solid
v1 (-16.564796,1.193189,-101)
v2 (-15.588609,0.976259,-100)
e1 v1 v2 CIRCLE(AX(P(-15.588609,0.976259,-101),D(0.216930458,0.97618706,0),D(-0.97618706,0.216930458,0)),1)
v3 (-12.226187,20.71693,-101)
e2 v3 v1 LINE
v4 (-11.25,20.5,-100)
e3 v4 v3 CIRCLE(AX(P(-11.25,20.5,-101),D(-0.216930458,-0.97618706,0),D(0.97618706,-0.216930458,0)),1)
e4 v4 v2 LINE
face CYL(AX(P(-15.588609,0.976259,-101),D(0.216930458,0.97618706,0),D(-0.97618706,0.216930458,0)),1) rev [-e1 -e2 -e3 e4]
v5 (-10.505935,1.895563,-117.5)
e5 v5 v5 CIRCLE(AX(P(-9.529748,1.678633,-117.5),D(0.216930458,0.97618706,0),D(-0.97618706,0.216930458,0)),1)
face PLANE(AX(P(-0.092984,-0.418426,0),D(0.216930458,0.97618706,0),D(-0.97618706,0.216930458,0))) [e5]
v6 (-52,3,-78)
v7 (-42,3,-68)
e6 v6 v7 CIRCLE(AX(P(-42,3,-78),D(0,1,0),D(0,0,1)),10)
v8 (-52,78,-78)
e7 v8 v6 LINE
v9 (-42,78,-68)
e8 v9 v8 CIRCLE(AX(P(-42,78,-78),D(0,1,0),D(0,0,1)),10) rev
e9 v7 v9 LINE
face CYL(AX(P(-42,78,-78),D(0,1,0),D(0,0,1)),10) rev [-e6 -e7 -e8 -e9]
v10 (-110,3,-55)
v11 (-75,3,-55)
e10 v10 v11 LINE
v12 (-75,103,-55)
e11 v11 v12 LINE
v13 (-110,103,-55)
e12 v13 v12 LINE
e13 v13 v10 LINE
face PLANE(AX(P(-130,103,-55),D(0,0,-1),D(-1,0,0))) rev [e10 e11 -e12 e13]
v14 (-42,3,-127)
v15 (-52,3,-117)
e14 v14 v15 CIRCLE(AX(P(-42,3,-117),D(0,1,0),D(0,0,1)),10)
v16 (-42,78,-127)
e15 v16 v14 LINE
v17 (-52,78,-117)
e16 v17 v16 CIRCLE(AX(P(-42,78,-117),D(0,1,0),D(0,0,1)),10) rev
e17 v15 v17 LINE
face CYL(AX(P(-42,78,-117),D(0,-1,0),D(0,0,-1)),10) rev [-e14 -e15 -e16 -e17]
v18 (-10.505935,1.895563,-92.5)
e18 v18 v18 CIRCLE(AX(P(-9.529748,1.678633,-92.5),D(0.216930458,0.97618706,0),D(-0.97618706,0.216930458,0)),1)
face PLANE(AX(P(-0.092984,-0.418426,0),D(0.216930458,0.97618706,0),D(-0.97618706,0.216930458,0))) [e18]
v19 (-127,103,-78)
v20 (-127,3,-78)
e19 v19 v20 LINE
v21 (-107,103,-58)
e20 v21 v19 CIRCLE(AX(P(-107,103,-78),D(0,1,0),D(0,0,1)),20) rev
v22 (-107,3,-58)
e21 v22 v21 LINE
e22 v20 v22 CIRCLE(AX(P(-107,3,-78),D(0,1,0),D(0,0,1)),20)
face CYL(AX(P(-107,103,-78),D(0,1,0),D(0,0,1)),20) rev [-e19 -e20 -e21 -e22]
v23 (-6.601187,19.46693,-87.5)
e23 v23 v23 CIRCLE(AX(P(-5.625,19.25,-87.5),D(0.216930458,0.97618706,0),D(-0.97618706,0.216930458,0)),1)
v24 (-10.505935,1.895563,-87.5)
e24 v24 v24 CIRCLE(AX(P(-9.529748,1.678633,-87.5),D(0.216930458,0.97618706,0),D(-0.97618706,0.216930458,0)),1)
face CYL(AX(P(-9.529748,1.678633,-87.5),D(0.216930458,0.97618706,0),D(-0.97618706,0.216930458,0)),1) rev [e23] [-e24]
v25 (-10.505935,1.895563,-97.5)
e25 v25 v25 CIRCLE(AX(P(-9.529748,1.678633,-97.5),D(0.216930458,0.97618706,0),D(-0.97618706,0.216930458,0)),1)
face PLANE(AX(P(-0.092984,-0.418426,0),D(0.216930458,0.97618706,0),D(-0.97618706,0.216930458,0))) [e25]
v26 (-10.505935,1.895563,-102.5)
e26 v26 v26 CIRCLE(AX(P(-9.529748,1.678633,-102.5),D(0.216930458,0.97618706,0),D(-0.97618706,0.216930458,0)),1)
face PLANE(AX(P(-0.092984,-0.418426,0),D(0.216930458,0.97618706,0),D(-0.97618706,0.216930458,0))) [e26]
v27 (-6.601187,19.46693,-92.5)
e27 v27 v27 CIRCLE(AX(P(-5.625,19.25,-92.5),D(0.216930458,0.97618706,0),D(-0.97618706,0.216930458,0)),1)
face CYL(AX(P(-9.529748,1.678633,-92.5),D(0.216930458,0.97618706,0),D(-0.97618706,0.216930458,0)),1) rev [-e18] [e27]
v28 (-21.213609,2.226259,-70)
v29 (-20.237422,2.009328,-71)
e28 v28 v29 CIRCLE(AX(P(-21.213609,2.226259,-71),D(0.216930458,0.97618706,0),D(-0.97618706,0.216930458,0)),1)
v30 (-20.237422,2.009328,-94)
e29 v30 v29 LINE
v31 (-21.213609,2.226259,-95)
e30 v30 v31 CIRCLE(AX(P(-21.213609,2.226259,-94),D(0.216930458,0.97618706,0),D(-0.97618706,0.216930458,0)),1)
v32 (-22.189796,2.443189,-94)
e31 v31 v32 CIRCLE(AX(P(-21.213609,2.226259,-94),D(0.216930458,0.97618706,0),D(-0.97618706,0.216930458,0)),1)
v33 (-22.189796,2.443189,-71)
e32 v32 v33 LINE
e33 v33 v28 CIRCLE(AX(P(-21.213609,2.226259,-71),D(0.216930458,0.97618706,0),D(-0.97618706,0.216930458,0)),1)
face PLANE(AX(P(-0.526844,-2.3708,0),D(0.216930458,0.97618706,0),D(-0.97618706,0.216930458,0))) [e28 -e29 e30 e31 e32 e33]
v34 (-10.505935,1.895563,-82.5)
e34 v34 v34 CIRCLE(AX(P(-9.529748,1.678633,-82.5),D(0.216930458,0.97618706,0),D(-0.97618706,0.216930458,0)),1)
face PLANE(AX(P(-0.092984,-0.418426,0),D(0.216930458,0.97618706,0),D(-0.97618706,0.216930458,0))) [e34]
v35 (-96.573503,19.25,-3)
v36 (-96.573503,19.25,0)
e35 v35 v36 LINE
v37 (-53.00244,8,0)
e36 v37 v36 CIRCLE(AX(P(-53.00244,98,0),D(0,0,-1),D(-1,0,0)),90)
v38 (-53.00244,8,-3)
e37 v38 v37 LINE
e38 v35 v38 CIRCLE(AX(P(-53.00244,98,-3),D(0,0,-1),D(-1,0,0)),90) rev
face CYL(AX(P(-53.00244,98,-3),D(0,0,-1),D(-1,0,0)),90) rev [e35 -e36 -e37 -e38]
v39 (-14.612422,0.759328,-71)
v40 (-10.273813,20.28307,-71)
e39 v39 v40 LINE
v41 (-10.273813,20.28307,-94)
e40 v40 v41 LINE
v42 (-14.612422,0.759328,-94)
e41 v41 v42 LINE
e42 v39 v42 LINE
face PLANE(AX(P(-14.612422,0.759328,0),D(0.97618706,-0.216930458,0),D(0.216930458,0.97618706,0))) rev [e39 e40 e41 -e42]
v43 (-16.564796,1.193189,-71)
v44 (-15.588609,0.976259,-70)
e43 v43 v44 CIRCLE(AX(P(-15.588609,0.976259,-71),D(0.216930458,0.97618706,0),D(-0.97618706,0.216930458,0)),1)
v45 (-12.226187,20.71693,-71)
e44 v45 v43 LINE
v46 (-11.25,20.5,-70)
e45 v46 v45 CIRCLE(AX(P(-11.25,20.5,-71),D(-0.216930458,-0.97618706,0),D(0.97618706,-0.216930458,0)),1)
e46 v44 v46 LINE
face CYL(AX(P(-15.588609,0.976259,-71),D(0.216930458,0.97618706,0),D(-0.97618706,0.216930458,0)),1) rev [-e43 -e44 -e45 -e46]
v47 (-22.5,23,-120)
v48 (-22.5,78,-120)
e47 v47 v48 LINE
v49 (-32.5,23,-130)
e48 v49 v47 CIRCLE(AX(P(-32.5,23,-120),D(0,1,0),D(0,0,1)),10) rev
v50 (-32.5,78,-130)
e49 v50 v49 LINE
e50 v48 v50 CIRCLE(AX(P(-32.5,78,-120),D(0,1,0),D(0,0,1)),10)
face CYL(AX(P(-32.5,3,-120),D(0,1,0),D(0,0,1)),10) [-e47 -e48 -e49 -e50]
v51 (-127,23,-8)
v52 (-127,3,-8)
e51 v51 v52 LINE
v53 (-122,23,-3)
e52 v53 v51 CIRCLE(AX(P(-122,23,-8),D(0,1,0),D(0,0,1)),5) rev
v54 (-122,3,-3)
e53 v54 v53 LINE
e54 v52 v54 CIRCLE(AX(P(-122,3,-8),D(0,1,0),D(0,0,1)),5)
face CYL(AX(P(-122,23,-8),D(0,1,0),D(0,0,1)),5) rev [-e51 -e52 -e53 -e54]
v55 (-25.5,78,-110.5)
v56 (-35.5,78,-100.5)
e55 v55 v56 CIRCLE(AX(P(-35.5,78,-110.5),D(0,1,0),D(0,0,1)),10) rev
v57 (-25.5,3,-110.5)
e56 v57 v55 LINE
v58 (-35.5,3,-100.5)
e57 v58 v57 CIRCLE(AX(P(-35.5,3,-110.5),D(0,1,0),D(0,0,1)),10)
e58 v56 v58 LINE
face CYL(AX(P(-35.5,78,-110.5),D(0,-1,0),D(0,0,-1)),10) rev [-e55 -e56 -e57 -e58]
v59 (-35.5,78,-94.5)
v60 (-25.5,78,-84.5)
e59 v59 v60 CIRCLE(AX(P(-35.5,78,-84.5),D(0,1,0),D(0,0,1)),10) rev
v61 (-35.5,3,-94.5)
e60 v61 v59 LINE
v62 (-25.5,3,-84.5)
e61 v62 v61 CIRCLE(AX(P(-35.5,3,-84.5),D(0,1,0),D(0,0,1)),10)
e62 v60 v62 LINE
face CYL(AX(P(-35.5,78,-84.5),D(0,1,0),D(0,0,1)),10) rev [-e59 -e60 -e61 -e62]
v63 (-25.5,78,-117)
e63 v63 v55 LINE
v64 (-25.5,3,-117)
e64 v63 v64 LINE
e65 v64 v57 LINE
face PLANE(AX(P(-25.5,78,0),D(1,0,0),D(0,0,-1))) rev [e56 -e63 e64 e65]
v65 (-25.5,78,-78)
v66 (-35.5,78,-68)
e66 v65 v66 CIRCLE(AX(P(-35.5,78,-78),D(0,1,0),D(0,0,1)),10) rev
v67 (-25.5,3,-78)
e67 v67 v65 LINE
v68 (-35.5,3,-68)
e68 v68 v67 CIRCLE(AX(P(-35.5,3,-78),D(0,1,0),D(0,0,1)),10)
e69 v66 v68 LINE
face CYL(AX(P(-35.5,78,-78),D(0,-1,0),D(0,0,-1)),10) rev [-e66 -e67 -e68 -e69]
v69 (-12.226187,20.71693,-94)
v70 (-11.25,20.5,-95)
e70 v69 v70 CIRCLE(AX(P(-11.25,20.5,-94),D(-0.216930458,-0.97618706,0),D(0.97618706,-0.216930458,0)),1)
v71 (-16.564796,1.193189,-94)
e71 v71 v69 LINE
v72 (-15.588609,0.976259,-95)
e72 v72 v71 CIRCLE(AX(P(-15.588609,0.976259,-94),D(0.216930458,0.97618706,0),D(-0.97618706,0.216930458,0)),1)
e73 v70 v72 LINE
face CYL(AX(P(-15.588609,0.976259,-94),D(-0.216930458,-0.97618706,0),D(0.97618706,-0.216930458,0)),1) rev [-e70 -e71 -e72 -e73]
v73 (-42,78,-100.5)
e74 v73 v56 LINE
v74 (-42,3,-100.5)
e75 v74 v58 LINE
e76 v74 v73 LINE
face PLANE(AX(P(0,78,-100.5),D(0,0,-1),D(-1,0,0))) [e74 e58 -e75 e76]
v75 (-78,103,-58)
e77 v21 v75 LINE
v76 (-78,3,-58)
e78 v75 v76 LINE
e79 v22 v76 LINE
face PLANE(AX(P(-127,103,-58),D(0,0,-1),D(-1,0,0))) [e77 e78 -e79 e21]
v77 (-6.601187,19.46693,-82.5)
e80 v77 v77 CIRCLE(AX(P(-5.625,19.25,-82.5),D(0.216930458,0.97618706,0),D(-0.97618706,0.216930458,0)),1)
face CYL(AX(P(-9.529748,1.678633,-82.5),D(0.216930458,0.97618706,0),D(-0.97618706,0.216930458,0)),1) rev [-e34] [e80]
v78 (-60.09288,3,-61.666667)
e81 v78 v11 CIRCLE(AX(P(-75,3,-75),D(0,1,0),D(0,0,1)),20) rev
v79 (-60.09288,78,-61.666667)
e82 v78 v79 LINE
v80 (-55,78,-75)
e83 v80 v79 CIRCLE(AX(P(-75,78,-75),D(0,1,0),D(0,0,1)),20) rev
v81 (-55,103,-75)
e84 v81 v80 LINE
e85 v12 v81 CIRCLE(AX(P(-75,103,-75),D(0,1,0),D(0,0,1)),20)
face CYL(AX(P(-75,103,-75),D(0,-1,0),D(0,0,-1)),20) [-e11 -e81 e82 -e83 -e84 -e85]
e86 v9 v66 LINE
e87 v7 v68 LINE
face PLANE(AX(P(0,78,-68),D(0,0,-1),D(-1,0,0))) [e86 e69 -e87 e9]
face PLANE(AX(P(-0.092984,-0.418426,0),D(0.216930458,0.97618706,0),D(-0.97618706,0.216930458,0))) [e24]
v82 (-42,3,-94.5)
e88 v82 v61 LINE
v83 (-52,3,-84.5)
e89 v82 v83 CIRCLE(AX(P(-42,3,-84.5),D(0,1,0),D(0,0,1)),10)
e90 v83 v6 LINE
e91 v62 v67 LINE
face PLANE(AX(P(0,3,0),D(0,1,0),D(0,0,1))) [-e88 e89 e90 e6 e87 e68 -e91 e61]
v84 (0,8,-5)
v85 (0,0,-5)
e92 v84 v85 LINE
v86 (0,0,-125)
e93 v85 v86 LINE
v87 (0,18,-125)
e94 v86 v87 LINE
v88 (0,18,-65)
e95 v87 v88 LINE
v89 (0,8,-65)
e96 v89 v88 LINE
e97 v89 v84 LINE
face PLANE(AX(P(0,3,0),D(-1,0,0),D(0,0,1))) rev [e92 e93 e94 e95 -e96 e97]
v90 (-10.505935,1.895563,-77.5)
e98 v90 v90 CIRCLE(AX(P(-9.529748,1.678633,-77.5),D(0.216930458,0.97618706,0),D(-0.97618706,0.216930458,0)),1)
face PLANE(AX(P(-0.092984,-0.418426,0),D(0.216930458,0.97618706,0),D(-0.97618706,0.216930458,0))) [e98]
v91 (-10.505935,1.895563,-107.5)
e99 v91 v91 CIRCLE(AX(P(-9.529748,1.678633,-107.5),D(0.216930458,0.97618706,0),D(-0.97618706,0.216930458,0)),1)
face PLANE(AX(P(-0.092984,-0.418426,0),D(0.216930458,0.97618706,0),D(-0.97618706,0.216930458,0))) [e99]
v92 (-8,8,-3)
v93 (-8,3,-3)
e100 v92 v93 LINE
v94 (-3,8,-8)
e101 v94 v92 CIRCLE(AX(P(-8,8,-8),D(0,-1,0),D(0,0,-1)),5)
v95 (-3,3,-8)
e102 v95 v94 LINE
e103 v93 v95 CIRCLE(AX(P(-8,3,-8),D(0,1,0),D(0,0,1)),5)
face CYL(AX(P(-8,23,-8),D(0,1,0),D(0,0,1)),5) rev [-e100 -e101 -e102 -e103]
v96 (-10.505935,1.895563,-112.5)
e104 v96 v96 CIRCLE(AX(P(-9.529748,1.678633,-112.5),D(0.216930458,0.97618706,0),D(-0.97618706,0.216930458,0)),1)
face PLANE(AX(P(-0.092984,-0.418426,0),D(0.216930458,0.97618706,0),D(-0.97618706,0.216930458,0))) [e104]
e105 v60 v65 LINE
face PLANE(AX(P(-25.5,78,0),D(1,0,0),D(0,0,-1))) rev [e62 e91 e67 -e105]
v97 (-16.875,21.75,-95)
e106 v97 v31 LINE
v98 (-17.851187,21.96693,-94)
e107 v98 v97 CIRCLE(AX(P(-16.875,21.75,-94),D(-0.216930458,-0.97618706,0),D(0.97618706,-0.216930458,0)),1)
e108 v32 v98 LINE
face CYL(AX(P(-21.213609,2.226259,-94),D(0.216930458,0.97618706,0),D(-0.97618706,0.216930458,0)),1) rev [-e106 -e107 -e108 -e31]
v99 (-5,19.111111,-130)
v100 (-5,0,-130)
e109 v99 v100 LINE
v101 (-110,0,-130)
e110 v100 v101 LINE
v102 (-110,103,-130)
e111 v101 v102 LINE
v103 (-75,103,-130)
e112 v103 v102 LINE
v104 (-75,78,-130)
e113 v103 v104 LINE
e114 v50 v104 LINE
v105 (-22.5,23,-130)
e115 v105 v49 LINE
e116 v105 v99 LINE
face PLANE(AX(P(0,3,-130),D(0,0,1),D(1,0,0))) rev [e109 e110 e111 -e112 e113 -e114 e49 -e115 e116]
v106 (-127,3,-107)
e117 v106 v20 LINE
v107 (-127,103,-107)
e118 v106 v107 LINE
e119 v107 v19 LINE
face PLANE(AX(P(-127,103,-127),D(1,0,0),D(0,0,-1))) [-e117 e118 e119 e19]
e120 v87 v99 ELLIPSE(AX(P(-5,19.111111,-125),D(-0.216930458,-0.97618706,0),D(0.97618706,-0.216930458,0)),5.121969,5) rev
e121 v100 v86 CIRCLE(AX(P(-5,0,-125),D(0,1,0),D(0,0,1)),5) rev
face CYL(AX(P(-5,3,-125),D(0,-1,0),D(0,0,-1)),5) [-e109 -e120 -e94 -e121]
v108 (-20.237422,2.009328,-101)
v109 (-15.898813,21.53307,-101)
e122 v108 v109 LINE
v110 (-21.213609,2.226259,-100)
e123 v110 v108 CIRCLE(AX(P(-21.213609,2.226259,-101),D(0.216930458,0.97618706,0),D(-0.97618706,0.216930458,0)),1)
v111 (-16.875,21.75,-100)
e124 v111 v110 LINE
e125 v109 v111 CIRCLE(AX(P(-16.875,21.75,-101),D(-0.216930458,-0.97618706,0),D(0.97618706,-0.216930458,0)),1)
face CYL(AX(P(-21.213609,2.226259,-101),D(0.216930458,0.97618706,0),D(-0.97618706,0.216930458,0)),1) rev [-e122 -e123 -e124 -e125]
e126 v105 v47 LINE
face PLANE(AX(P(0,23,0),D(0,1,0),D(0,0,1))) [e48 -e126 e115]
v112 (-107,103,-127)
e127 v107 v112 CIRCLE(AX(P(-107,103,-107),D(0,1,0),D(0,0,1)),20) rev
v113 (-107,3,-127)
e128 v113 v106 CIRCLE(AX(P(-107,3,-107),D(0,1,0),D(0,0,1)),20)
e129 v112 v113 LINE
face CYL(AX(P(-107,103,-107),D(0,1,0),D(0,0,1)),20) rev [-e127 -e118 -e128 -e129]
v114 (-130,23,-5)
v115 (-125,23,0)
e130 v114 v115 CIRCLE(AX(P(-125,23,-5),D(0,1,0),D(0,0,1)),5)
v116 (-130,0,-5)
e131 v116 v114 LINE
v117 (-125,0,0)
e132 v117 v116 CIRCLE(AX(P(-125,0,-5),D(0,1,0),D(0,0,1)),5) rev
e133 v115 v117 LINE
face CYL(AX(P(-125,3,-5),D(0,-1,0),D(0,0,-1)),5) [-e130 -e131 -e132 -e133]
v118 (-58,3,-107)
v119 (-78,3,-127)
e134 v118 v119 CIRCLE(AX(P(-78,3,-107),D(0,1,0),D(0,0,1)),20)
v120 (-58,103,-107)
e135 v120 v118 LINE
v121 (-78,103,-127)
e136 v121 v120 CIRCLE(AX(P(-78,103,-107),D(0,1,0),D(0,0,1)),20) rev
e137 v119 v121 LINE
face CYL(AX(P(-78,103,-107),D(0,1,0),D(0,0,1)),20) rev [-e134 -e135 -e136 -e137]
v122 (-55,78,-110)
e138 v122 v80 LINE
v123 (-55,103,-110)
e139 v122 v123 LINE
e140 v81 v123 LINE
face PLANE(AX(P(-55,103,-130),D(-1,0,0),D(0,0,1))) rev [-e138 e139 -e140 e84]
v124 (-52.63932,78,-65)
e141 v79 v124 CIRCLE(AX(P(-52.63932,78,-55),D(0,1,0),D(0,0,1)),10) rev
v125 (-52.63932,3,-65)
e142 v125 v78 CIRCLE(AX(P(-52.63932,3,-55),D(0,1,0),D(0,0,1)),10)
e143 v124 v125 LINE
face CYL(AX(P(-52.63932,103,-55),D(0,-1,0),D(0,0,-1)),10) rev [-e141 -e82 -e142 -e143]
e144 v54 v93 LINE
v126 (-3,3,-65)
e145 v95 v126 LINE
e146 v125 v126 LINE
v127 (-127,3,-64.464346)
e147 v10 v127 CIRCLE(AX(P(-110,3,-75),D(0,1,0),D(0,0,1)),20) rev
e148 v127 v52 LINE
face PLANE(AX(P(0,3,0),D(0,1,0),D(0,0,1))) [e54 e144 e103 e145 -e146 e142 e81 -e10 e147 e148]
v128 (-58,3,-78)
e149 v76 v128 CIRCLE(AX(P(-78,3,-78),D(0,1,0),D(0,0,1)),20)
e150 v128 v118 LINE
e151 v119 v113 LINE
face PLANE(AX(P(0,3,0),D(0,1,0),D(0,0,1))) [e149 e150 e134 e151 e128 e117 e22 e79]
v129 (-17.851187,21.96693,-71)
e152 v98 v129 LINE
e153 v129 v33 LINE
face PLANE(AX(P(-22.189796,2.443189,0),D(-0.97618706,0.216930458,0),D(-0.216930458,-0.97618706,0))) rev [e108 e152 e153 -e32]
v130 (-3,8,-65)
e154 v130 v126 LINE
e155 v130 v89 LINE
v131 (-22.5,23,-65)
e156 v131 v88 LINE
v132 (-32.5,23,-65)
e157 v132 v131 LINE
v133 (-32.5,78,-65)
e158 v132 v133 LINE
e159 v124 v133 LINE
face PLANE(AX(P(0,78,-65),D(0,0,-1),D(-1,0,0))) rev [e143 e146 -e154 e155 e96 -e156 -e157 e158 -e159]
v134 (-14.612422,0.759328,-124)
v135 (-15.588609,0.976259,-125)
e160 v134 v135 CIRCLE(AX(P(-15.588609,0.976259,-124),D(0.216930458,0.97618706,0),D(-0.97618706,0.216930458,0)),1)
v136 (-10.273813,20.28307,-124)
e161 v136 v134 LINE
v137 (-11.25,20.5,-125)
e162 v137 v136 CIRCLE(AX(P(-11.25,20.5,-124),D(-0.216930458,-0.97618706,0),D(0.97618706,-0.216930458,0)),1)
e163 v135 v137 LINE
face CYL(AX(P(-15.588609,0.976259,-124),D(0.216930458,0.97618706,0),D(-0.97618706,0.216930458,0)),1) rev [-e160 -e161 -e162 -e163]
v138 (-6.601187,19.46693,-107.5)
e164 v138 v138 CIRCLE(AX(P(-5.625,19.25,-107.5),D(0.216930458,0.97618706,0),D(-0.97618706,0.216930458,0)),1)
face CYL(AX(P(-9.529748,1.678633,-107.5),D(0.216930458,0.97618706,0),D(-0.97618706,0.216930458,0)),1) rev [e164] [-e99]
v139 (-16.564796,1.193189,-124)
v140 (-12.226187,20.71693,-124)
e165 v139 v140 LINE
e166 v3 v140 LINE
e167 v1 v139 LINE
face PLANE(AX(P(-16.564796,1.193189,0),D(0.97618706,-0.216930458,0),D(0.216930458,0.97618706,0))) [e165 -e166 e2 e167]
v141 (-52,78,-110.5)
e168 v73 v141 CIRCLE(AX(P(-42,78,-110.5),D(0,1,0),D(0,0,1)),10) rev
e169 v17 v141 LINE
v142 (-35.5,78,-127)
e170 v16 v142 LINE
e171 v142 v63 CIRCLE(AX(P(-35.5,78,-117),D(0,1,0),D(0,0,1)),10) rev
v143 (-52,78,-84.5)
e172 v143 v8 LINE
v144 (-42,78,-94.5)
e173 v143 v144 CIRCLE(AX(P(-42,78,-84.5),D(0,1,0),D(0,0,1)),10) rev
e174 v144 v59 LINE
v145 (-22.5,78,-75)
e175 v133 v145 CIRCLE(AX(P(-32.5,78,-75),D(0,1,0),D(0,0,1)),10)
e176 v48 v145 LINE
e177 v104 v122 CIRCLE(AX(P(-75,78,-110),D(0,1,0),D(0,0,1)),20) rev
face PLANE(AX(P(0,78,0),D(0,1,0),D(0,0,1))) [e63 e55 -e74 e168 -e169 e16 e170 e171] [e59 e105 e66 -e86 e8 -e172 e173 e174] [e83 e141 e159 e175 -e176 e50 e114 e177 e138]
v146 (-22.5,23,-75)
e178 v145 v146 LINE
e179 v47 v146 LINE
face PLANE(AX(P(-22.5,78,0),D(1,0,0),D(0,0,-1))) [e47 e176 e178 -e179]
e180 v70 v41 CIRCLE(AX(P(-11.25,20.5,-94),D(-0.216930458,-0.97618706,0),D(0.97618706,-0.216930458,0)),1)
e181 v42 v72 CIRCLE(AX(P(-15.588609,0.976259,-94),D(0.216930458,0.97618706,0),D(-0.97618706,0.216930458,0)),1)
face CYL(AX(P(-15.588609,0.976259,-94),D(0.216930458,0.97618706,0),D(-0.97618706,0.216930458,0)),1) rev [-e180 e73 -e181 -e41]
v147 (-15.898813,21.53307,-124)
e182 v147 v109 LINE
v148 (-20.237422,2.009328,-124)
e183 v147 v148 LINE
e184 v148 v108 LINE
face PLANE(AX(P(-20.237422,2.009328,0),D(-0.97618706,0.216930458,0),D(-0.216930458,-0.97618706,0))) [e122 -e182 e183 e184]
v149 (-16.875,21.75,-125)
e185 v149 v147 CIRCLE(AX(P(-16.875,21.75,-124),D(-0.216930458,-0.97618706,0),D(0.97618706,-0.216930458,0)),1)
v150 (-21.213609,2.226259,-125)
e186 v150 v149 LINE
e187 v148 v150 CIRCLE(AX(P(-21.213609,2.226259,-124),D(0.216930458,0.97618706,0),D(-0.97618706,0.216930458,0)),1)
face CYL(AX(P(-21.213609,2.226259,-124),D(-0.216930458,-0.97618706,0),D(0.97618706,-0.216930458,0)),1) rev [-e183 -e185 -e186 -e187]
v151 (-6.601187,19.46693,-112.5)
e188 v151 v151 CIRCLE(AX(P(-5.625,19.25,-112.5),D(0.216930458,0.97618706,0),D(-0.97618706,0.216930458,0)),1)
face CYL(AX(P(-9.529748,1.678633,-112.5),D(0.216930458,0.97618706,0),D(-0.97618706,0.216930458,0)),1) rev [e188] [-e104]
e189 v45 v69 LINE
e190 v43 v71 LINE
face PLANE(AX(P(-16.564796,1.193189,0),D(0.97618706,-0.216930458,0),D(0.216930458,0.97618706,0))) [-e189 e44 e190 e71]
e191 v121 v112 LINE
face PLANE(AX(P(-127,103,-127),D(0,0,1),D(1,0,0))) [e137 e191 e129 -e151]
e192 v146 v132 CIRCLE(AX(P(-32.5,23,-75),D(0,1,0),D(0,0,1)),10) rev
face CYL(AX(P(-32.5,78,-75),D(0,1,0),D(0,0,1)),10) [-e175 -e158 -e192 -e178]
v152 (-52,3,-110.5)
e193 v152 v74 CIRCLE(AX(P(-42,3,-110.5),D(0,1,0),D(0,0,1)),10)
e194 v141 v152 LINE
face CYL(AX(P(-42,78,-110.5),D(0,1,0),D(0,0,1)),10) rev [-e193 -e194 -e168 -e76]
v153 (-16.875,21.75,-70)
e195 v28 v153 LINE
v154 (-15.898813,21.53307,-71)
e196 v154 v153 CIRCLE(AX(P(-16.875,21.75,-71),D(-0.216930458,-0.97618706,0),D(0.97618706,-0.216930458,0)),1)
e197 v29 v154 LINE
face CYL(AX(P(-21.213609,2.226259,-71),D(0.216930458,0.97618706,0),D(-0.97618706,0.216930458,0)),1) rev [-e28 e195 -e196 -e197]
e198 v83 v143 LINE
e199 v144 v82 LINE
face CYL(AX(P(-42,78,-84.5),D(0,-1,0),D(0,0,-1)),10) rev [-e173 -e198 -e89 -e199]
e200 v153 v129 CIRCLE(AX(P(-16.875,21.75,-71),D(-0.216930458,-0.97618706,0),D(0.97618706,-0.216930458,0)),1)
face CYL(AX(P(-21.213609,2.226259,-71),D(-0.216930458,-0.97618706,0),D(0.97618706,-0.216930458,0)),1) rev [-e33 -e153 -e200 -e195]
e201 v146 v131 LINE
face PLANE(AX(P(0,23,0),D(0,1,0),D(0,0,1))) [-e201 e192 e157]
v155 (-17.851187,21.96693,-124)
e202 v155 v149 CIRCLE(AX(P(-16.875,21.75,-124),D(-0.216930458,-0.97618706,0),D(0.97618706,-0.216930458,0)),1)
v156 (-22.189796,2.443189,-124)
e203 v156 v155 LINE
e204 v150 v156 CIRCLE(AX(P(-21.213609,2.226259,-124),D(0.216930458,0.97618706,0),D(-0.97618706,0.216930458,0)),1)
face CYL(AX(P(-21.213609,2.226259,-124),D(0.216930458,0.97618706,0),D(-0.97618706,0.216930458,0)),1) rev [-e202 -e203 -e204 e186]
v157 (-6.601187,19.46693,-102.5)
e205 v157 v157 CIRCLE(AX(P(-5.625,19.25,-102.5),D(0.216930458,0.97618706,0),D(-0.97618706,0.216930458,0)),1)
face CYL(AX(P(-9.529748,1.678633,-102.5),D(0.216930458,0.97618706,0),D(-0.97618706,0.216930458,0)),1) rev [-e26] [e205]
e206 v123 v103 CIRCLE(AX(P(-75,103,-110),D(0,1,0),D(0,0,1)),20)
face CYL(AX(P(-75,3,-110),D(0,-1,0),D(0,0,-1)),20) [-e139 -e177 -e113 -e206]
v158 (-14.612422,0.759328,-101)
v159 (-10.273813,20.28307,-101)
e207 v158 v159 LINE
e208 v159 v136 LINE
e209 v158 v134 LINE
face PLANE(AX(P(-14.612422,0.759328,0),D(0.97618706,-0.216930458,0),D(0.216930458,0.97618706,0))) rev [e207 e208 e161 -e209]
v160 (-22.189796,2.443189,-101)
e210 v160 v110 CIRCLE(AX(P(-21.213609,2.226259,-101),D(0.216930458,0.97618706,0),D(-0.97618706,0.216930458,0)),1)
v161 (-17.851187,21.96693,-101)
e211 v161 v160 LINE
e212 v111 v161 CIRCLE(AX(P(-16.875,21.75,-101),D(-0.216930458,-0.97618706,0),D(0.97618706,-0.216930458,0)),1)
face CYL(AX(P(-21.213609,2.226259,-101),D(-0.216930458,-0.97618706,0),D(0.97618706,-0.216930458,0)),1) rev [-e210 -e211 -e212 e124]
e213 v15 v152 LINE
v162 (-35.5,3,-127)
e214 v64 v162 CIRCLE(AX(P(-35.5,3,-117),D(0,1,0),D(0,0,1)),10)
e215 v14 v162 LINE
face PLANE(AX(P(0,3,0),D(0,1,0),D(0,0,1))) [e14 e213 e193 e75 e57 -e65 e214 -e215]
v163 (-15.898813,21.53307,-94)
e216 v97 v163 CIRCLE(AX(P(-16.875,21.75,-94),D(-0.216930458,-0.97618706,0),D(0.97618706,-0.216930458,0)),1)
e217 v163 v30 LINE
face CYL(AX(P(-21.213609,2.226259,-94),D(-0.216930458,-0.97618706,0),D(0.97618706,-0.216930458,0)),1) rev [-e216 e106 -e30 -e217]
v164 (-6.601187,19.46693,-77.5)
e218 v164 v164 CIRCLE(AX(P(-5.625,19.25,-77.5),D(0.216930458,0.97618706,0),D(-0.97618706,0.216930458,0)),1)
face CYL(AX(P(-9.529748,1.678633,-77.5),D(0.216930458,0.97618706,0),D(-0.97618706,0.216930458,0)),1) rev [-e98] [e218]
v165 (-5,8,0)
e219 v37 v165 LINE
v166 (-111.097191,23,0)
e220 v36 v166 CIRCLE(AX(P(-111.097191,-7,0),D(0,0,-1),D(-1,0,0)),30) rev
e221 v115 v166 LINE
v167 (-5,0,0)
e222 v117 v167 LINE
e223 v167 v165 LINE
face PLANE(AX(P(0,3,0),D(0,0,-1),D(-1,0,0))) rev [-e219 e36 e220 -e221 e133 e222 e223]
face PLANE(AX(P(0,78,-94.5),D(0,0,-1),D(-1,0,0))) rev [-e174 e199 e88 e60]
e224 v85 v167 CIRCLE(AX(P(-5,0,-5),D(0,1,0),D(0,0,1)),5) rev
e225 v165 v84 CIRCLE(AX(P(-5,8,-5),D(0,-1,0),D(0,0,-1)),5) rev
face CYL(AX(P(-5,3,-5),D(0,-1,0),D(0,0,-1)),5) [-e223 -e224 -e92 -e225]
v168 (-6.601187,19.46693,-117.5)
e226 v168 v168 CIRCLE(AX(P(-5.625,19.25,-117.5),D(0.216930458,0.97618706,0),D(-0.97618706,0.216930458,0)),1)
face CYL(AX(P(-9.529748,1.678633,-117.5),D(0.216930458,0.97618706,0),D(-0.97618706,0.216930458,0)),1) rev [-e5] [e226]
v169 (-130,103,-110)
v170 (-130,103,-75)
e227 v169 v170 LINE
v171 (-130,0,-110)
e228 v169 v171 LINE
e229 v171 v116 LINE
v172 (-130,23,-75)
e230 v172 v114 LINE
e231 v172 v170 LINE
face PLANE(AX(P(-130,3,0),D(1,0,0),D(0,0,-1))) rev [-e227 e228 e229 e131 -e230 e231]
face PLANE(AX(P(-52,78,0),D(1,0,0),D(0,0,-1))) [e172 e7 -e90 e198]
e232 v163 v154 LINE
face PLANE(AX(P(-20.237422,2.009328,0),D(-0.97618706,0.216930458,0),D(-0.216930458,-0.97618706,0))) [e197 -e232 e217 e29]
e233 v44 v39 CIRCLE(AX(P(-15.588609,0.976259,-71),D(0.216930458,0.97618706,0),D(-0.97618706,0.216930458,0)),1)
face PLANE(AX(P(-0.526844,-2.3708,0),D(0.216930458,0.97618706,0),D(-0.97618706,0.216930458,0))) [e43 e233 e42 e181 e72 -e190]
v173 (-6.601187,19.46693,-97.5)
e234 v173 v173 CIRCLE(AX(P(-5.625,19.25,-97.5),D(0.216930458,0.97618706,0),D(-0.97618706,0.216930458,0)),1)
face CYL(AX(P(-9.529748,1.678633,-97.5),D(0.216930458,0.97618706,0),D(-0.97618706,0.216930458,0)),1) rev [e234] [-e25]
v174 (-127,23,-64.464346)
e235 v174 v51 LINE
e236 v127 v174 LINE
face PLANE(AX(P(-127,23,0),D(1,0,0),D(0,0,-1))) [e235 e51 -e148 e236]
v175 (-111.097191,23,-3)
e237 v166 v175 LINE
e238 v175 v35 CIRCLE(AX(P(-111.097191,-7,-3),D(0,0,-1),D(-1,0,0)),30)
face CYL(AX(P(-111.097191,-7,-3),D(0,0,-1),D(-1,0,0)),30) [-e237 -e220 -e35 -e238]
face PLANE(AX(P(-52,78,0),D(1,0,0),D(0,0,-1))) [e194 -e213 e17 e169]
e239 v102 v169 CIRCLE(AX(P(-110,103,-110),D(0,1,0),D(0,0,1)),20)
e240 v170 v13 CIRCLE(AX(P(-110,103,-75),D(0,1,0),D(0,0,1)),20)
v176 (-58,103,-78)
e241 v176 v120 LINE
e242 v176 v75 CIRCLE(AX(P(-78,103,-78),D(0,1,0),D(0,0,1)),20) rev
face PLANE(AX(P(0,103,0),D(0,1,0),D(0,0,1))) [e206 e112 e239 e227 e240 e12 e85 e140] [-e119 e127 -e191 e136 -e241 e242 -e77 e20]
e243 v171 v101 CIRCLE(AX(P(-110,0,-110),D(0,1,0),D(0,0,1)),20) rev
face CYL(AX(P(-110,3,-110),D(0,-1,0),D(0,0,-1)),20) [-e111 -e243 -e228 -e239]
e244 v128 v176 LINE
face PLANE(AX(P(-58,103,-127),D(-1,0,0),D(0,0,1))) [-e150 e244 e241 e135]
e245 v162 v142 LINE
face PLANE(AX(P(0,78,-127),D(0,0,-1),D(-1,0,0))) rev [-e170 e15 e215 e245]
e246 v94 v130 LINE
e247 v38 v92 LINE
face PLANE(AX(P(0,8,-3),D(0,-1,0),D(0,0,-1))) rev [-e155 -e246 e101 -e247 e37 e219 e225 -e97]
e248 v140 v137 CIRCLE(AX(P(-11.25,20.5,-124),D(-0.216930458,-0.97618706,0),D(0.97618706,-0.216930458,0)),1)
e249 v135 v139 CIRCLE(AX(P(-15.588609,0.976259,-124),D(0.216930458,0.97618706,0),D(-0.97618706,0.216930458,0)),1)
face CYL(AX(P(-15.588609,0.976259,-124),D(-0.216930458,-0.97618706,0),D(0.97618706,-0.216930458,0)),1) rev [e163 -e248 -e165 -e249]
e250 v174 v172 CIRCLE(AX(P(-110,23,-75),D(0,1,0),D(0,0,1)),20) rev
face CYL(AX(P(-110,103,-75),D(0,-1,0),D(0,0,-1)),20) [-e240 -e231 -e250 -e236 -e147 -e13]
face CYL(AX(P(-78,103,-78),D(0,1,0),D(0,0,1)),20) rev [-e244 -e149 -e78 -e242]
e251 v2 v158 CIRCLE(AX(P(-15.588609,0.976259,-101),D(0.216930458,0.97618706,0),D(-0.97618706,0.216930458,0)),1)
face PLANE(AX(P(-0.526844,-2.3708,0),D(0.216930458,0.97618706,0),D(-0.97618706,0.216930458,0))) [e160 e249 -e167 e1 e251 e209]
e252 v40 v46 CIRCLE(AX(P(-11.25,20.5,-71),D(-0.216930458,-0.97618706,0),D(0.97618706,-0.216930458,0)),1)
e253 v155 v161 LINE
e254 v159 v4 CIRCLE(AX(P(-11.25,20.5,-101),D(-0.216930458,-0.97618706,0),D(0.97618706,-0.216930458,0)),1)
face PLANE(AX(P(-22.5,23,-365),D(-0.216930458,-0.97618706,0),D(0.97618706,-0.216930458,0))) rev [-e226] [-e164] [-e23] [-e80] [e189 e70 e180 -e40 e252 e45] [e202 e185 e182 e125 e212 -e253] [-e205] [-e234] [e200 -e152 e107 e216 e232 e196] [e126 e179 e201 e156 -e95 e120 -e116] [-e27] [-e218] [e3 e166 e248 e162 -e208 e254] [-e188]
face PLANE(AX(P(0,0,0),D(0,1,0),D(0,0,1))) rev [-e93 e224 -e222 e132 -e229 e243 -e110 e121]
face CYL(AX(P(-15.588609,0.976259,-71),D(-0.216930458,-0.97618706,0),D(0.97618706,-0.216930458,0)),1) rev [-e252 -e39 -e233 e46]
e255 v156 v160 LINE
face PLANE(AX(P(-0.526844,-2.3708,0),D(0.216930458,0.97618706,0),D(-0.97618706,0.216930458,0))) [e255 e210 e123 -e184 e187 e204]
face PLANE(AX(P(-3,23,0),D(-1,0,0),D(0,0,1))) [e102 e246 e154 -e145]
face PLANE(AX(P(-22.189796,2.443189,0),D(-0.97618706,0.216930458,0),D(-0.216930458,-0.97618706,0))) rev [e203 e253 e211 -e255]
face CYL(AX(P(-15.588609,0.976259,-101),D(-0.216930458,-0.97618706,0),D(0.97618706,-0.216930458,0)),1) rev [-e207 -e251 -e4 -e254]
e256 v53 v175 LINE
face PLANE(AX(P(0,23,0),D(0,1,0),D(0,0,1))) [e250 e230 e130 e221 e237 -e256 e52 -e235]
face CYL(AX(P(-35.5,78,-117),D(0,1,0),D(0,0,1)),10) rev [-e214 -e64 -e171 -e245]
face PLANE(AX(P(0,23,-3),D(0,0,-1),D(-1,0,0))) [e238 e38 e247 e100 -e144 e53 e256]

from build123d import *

# Parameters (mm, degrees)
EXTRUDE_1_DEPTH      = 3
EXTRUDE_2_DEPTH      = 100
SKETCH_3_W           = 26.5
SKETCH_3_H           = 26.50000000000003
SKETCH_3_W_2         = 26.500000000000004
SKETCH_3_H_2         = 26.5
EXTRUDE_3_DEPTH      = 75
FILLET_2_R           = 20
FILLET_3_R           = 20
FILLET_6_R           = 10
EXTRUDE_7_DEPTH      = 20
SKETCH_14_W          = 22.50000000000002
SKETCH_14_H          = 65
EXTRUDE_8_DEPTH      = 20
SKETCH_15_W          = 102.75181222829023
SKETCH_15_H          = 15
CUT_EXTRUDE_6_DEPTH  = 2.99999999999999
FILLET_7_R           = 90
FILLET_8_R           = 30
SKETCH_17_W          = 62.00000000000001
SKETCH_17_H          = 15
CUT_EXTRUDE_8_DEPTH  = 2.99999999999999
FILLET_9_R           = 5
FILLET_11_R          = 20
FILLET_12_R          = 20
FILLET_13_R          = 10
CUT_EXTRUDE_9_DEPTH  = 300
SKETCH_19_R          = 1.0000000000000018
SKETCH_19_R_2        = 1
SKETCH_19_R_3        = 1.0000000000000033
CUT_EXTRUDE_12_DEPTH = 18
SKETCH_19_4_W        = 2
SKETCH_19_4_H        = 25
SKETCH_19_4_W_2      = 2.0000000000000018
CUT_EXTRUDE_13_DEPTH = 20
FILLET_15_R          = 1


# Some blends are built 0.0001 mm under size
with BuildPart() as part:
    # Эскиз1 → Бобышка-Вытянуть1 (new body)
    with BuildSketch(Plane(origin=(0, 0, 0), x_dir=(1, 0, 0), z_dir=(0, 1, 0))):
        Polygon((0, 0), (-130, -1.837e-14), (-130, 129.99999999999997), (0, 130), align=None)
    extrude(amount=EXTRUDE_1_DEPTH)

    # Эскиз2 → Бобышка-Вытянуть2 (add)
    with BuildSketch(Plane(origin=(0, 3, 0), x_dir=(1, 0, 0), z_dir=(0, 1, 0))):
        Polygon((-130, 129.99999999999997), (-55.00000000000002, 130.0000000000001), (-55.00000000000002, 55.0000000000001), (-130.00000000000003, 55.0000000000001), align=None)
        Polygon((-127, 126.99999999999997), (-58.00000000000002, 127.00000000000009), (-58.000000000000014, 58.0000000000001), (-127.00000000000003, 58.00000000000009), align=None, mode=Mode.SUBTRACT)
    extrude(amount=EXTRUDE_2_DEPTH)

    # Эскиз3 → Бобышка-Вытянуть3 (add)
    # profile 1 of 2: a face of its own
    with BuildSketch(Plane(origin=(0, 3, 0), x_dir=(1, 0, 0), z_dir=(0, 1, 0))):
        Polygon((-22.50000000000002, 130), (-55.00000000000002, 130), (-55.00000000000002, 97.5), (-22.500000000000014, 97.5), align=None)
        with Locations((-38.75000000000002, 113.75)):
            Rectangle(SKETCH_3_W, SKETCH_3_H, mode=Mode.SUBTRACT)
    # profile 2 of 2: a face of its own
    with BuildSketch(Plane(origin=(0, 3, 0), x_dir=(1, 0, 0), z_dir=(0, 1, 0))):
        Polygon((-22.500000000000014, 97.5), (-55.00000000000002, 97.5), (-55.00000000000002, 65), (-22.5, 65), align=None)
        with Locations((-38.750000000000014, 81.25)):
            Rectangle(SKETCH_3_W_2, SKETCH_3_H_2, mode=Mode.SUBTRACT)
    extrude(amount=EXTRUDE_3_DEPTH)

    # Скругление2
    fillet_2_edges = [part.edges().sort_by_distance(p)[0] for p in [
        (-127, 53, -126.99999999999997),
        (-130, 51.5, -129.99999999999997),
    ]]
    fillet(fillet_2_edges, radius=FILLET_2_R)

    # Скругление3
    fillet_3_edges = [part.edges().sort_by_distance(p)[0] for p in [
        (-58.000000000000014, 53, -58.0000000000001),
        (-55.00000000000002, 53, -55.0000000000001),
        (-58.00000000000002, 53, -127.00000000000009),
        (-55.00000000000002, 90.5, -130.0000000000001),
    ]]
    fillet(fillet_3_edges, radius=FILLET_3_R)

    # Скругление6
    fillet_6_edges = [part.edges().sort_by_distance(p)[0] for p in [
        (-57.6794919243113, 40.5, -65),
        (-52.000000000000014, 40.5, -94.50000000000001),
        (-25.500000000000014, 40.5, -94.50000000000001),
        (-25.500000000000014, 40.5, -68),
        (-52.00000000000003, 40.5, -127),
        (-25.50000000000002, 40.5, -127),
        (-25.50000000000002, 40.5, -100.49999999999999),
        (-52.00000000000003, 40.5, -100.49999999999999),
        (-52.000000000000014, 40.5, -68),
    ]]
    fillet(fillet_6_edges, radius=FILLET_6_R)

    # Эскиз4 → Бобышка-Вытянуть7 (add)
    with BuildSketch(Plane(origin=(0, 3, 0), x_dir=(1, 0, 0), z_dir=(0, 1, 0))):
        Polygon((-3, 65), (-3, 2.999999999999999), (0, 2.999999999999982), (0, 65), align=None)
        Polygon((-3, 2.999999999999982), (-126.99999999999997, 2.999999999999982), (-126.99999999999997, -2.132e-14), (0, -1.721e-14), (0, 2.999999999999982), align=None)
        Polygon((-127, 55.0000000000001), (-130, 55.0000000000001), (-130, -1.421e-14), (-126.99999999999997, -1.837e-14), (-126.99999999999997, 2.9999999999999787), align=None)
    extrude(amount=EXTRUDE_7_DEPTH)

    # Эскиз14 → Бобышка-Вытянуть8 (add)
    with BuildSketch(Plane(origin=(0, 3, 0), x_dir=(1, 0, 0), z_dir=(0, 1, 0))):
        with Locations((-11.25000000000001, 97.5)):
            Rectangle(SKETCH_14_W, SKETCH_14_H)
    extrude(amount=EXTRUDE_8_DEPTH)

    # Эскиз15 → Вырез-Вытянуть6 (cut)
    with BuildSketch(Plane.XY):
        with Locations((-51.37590611414512, 15.5)):
            Rectangle(SKETCH_15_W, SKETCH_15_H)
    extrude(amount=-CUT_EXTRUDE_6_DEPTH, mode=Mode.SUBTRACT)

    # Скругление7
    # the kernel refuses this fillet: 90 mm, written as the material it adds along each edge
    with BuildSketch(Plane(origin=(-102.75181222829023, 8, 0), x_dir=(-9.5e-16, 1, 0), z_dir=(0, 0, -1))) as fillet_7_piece_1:
        with BuildLine():
            CenterArc((89.99999999999996, 49.74937185533107), FILLET_7_R, 180.00000000000006, 33.55730976192069)
            Line((-4.713e-14, 49.749371855330985), (-1.800000000000047, 49.749371855330985))
            Line((-1.800000000000047, 49.749371855330985), (-1.7999999999999998, -1.71e-15))
            Line((-1.7999999999999998, -1.71e-15), (1.71e-15, -1.7999999999999972))
            ThreePointArc((1.71e-15, -1.7999999999999972), (7.499999999999995, -1.79999999999999), (13.499999999999988, -0.9949874371066173))
            Line((13.499999999999988, -0.9949874371066173), (14.999999999999986, 0))
        make_face()
    extrude(amount=2.99999999999999)

    # Скругление8
    fillet_8_edges = [part.edges().sort_by_distance(p)[0] for p in [
        (-102.75181222829023, 23, -1.499999999999995),
    ]]
    fillet(fillet_8_edges, radius=FILLET_8_R)

    # Эскиз17 → Вырез-Вытянуть8 (cut)
    with BuildSketch(Plane(origin=(0, 0, 0), x_dir=(0, 0, -1), z_dir=(1, 0, 0))):
        with Locations((33.99999999999999, 15.5)):
            Rectangle(SKETCH_17_W, SKETCH_17_H)
    extrude(amount=-CUT_EXTRUDE_8_DEPTH, mode=Mode.SUBTRACT)

    # Скругление9
    fillet_9_edges = [part.edges().sort_by_distance(p)[0] for p in [
        (-126.99999999999997, 13, -2.9999999999999805),
        (-3, 5.5, -2.9999999999999902),
        (0, 4, 2.99e-15),
        (-130, 11.5, 1.704e-14),
        (0, 11.5, -130),
    ]]
    fillet(fillet_9_edges, radius=FILLET_9_R)

    # Скругление11
    fillet_11_edges = [part.edges().sort_by_distance(p)[0] for p in [
        (-127.00000000000003, 53, -58.00000000000009),
    ]]
    fillet(fillet_11_edges, radius=FILLET_11_R)

    # Скругление12
    fillet_12_edges = [part.edges().sort_by_distance(p)[0] for p in [
        (-130.00000000000003, 63, -55.0000000000001),
    ]]
    fillet(fillet_12_edges, radius=FILLET_12_R)

    # Скругление13
    fillet_13_edges = [part.edges().sort_by_distance(p)[0] for p in [
        (-22.5, 50.5, -65),
        (-22.50000000000002, 50.5, -130),
    ]]
    fillet(fillet_13_edges, radius=FILLET_13_R)

    # Эскиз18 → Вырез-Вытянуть9 (cut)
    with BuildSketch(Plane.XY.offset(-65)):
        Polygon((-22.50000000000001, 22.999999999999993), (0, 18), (0, 23), align=None)
    extrude(amount=-CUT_EXTRUDE_9_DEPTH, mode=Mode.SUBTRACT)

    # Эскиз19 → Вырез-Вытянуть12 (cut)
    with BuildSketch(Plane(origin=(3.811764705882347, 17.15294117647059, 0), x_dir=(0.9761870601839528, -0.2169304578186562, 0), z_dir=(0.2169304578186562, 0.9761870601839528, 0))):
        with Locations(Location((-9.666963526543862, 102.5, 0), (0, 0, 180))):
            Circle(SKETCH_19_R)
        with Locations(Location((-9.666963526543864, 107.5, 0), (0, 0, 180))):
            Circle(SKETCH_19_R_2)
        with Locations(Location((-9.666963526543864, 112.49999999999999, 0), (0, 0, 180))):
            Circle(SKETCH_19_R_2)
        with Locations(Location((-9.666963526543865, 117.49999999999999, 0), (0, 0, 180))):
            Circle(SKETCH_19_R)
        with Locations(Location((-9.666963526543862, 97.5, 0), (0, 0, 180))):
            Circle(SKETCH_19_R)
        with Locations(Location((-9.666963526543793, 92.50000000000001, 0), (0, 0, 180))):
            Circle(SKETCH_19_R)
        with Locations(Location((-9.666963526543721, 87.50000000000001, 0), (0, 0, 180))):
            Circle(SKETCH_19_R_2)
        with Locations(Location((-9.666963526543652, 82.50000000000001, 0), (0, 0, 180))):
            Circle(SKETCH_19_R_3)
        with Locations(Location((-9.66696352654358, 77.50000000000003, 0), (0, 0, 180))):
            Circle(SKETCH_19_R)
    extrude(amount=-CUT_EXTRUDE_12_DEPTH, mode=Mode.SUBTRACT)

    # Эскиз19<4> → Вырез-Вытянуть13 (cut)
    with BuildSketch(Plane(origin=(3.811764705882347, 17.15294117647059, 0), x_dir=(0.9761870601839528, -0.2169304578186562, 0), z_dir=(0.2169304578186562, 0.9761870601839528, 0))):
        Polygon((-22.191394098159968, 125.00000000000003), (-22.191394098159964, 100), (-20.191394098159968, 100), (-20.19139409815997, 125.00000000000003), align=None)
        Polygon((-20.191394098159975, 95.00000000000003), (-20.19139409815997, 70), (-22.191394098159968, 70), (-22.19139409815997, 95.00000000000003), align=None)
        with Locations((-15.429178812351914, 112.50000000000001)):
            Rectangle(SKETCH_19_4_W, SKETCH_19_4_H)
        with Locations((-15.429178812351918, 82.5)):
            Rectangle(SKETCH_19_4_W_2, SKETCH_19_4_H)
    extrude(amount=-CUT_EXTRUDE_13_DEPTH, mode=Mode.SUBTRACT)

    # Скругление15
    fillet_15_edges = [part.edges().sort_by_distance(p)[0] for p in [
        (-14.395491638370515, 10.95505985597913, -100),
        (-20.020491638370512, 12.205059855979126, -100),
        (-14.395491638370515, 10.95505985597913, -125),
        (-20.020491638370515, 12.20505985597913, -125.00000000000003),
        (-18.068117518002612, 11.771198940341815, -100),
        (-12.44311751800261, 10.521198940341815, -100),
        (-12.44311751800261, 10.521198940341815, -125),
        (-18.068117518002612, 11.771198940341815, -125.00000000000003),
        (-12.443117518002612, 10.521198940341815, -95),
        (-18.068117518002616, 11.771198940341819, -95.00000000000003),
        (-14.395491638370519, 10.95505985597913, -95),
        (-20.02049163837052, 12.20505985597913, -95.00000000000003),
        (-12.443117518002612, 10.521198940341815, -70),
        (-18.068117518002612, 11.771198940341815, -70),
        (-14.395491638370519, 10.95505985597913, -70),
        (-20.020491638370515, 12.20505985597913, -70),
    ]]
    fillet(fillet_15_edges, radius=FILLET_15_R - 0.0001)  # a hair under: the kernel refuses the full size


solid = part.part
